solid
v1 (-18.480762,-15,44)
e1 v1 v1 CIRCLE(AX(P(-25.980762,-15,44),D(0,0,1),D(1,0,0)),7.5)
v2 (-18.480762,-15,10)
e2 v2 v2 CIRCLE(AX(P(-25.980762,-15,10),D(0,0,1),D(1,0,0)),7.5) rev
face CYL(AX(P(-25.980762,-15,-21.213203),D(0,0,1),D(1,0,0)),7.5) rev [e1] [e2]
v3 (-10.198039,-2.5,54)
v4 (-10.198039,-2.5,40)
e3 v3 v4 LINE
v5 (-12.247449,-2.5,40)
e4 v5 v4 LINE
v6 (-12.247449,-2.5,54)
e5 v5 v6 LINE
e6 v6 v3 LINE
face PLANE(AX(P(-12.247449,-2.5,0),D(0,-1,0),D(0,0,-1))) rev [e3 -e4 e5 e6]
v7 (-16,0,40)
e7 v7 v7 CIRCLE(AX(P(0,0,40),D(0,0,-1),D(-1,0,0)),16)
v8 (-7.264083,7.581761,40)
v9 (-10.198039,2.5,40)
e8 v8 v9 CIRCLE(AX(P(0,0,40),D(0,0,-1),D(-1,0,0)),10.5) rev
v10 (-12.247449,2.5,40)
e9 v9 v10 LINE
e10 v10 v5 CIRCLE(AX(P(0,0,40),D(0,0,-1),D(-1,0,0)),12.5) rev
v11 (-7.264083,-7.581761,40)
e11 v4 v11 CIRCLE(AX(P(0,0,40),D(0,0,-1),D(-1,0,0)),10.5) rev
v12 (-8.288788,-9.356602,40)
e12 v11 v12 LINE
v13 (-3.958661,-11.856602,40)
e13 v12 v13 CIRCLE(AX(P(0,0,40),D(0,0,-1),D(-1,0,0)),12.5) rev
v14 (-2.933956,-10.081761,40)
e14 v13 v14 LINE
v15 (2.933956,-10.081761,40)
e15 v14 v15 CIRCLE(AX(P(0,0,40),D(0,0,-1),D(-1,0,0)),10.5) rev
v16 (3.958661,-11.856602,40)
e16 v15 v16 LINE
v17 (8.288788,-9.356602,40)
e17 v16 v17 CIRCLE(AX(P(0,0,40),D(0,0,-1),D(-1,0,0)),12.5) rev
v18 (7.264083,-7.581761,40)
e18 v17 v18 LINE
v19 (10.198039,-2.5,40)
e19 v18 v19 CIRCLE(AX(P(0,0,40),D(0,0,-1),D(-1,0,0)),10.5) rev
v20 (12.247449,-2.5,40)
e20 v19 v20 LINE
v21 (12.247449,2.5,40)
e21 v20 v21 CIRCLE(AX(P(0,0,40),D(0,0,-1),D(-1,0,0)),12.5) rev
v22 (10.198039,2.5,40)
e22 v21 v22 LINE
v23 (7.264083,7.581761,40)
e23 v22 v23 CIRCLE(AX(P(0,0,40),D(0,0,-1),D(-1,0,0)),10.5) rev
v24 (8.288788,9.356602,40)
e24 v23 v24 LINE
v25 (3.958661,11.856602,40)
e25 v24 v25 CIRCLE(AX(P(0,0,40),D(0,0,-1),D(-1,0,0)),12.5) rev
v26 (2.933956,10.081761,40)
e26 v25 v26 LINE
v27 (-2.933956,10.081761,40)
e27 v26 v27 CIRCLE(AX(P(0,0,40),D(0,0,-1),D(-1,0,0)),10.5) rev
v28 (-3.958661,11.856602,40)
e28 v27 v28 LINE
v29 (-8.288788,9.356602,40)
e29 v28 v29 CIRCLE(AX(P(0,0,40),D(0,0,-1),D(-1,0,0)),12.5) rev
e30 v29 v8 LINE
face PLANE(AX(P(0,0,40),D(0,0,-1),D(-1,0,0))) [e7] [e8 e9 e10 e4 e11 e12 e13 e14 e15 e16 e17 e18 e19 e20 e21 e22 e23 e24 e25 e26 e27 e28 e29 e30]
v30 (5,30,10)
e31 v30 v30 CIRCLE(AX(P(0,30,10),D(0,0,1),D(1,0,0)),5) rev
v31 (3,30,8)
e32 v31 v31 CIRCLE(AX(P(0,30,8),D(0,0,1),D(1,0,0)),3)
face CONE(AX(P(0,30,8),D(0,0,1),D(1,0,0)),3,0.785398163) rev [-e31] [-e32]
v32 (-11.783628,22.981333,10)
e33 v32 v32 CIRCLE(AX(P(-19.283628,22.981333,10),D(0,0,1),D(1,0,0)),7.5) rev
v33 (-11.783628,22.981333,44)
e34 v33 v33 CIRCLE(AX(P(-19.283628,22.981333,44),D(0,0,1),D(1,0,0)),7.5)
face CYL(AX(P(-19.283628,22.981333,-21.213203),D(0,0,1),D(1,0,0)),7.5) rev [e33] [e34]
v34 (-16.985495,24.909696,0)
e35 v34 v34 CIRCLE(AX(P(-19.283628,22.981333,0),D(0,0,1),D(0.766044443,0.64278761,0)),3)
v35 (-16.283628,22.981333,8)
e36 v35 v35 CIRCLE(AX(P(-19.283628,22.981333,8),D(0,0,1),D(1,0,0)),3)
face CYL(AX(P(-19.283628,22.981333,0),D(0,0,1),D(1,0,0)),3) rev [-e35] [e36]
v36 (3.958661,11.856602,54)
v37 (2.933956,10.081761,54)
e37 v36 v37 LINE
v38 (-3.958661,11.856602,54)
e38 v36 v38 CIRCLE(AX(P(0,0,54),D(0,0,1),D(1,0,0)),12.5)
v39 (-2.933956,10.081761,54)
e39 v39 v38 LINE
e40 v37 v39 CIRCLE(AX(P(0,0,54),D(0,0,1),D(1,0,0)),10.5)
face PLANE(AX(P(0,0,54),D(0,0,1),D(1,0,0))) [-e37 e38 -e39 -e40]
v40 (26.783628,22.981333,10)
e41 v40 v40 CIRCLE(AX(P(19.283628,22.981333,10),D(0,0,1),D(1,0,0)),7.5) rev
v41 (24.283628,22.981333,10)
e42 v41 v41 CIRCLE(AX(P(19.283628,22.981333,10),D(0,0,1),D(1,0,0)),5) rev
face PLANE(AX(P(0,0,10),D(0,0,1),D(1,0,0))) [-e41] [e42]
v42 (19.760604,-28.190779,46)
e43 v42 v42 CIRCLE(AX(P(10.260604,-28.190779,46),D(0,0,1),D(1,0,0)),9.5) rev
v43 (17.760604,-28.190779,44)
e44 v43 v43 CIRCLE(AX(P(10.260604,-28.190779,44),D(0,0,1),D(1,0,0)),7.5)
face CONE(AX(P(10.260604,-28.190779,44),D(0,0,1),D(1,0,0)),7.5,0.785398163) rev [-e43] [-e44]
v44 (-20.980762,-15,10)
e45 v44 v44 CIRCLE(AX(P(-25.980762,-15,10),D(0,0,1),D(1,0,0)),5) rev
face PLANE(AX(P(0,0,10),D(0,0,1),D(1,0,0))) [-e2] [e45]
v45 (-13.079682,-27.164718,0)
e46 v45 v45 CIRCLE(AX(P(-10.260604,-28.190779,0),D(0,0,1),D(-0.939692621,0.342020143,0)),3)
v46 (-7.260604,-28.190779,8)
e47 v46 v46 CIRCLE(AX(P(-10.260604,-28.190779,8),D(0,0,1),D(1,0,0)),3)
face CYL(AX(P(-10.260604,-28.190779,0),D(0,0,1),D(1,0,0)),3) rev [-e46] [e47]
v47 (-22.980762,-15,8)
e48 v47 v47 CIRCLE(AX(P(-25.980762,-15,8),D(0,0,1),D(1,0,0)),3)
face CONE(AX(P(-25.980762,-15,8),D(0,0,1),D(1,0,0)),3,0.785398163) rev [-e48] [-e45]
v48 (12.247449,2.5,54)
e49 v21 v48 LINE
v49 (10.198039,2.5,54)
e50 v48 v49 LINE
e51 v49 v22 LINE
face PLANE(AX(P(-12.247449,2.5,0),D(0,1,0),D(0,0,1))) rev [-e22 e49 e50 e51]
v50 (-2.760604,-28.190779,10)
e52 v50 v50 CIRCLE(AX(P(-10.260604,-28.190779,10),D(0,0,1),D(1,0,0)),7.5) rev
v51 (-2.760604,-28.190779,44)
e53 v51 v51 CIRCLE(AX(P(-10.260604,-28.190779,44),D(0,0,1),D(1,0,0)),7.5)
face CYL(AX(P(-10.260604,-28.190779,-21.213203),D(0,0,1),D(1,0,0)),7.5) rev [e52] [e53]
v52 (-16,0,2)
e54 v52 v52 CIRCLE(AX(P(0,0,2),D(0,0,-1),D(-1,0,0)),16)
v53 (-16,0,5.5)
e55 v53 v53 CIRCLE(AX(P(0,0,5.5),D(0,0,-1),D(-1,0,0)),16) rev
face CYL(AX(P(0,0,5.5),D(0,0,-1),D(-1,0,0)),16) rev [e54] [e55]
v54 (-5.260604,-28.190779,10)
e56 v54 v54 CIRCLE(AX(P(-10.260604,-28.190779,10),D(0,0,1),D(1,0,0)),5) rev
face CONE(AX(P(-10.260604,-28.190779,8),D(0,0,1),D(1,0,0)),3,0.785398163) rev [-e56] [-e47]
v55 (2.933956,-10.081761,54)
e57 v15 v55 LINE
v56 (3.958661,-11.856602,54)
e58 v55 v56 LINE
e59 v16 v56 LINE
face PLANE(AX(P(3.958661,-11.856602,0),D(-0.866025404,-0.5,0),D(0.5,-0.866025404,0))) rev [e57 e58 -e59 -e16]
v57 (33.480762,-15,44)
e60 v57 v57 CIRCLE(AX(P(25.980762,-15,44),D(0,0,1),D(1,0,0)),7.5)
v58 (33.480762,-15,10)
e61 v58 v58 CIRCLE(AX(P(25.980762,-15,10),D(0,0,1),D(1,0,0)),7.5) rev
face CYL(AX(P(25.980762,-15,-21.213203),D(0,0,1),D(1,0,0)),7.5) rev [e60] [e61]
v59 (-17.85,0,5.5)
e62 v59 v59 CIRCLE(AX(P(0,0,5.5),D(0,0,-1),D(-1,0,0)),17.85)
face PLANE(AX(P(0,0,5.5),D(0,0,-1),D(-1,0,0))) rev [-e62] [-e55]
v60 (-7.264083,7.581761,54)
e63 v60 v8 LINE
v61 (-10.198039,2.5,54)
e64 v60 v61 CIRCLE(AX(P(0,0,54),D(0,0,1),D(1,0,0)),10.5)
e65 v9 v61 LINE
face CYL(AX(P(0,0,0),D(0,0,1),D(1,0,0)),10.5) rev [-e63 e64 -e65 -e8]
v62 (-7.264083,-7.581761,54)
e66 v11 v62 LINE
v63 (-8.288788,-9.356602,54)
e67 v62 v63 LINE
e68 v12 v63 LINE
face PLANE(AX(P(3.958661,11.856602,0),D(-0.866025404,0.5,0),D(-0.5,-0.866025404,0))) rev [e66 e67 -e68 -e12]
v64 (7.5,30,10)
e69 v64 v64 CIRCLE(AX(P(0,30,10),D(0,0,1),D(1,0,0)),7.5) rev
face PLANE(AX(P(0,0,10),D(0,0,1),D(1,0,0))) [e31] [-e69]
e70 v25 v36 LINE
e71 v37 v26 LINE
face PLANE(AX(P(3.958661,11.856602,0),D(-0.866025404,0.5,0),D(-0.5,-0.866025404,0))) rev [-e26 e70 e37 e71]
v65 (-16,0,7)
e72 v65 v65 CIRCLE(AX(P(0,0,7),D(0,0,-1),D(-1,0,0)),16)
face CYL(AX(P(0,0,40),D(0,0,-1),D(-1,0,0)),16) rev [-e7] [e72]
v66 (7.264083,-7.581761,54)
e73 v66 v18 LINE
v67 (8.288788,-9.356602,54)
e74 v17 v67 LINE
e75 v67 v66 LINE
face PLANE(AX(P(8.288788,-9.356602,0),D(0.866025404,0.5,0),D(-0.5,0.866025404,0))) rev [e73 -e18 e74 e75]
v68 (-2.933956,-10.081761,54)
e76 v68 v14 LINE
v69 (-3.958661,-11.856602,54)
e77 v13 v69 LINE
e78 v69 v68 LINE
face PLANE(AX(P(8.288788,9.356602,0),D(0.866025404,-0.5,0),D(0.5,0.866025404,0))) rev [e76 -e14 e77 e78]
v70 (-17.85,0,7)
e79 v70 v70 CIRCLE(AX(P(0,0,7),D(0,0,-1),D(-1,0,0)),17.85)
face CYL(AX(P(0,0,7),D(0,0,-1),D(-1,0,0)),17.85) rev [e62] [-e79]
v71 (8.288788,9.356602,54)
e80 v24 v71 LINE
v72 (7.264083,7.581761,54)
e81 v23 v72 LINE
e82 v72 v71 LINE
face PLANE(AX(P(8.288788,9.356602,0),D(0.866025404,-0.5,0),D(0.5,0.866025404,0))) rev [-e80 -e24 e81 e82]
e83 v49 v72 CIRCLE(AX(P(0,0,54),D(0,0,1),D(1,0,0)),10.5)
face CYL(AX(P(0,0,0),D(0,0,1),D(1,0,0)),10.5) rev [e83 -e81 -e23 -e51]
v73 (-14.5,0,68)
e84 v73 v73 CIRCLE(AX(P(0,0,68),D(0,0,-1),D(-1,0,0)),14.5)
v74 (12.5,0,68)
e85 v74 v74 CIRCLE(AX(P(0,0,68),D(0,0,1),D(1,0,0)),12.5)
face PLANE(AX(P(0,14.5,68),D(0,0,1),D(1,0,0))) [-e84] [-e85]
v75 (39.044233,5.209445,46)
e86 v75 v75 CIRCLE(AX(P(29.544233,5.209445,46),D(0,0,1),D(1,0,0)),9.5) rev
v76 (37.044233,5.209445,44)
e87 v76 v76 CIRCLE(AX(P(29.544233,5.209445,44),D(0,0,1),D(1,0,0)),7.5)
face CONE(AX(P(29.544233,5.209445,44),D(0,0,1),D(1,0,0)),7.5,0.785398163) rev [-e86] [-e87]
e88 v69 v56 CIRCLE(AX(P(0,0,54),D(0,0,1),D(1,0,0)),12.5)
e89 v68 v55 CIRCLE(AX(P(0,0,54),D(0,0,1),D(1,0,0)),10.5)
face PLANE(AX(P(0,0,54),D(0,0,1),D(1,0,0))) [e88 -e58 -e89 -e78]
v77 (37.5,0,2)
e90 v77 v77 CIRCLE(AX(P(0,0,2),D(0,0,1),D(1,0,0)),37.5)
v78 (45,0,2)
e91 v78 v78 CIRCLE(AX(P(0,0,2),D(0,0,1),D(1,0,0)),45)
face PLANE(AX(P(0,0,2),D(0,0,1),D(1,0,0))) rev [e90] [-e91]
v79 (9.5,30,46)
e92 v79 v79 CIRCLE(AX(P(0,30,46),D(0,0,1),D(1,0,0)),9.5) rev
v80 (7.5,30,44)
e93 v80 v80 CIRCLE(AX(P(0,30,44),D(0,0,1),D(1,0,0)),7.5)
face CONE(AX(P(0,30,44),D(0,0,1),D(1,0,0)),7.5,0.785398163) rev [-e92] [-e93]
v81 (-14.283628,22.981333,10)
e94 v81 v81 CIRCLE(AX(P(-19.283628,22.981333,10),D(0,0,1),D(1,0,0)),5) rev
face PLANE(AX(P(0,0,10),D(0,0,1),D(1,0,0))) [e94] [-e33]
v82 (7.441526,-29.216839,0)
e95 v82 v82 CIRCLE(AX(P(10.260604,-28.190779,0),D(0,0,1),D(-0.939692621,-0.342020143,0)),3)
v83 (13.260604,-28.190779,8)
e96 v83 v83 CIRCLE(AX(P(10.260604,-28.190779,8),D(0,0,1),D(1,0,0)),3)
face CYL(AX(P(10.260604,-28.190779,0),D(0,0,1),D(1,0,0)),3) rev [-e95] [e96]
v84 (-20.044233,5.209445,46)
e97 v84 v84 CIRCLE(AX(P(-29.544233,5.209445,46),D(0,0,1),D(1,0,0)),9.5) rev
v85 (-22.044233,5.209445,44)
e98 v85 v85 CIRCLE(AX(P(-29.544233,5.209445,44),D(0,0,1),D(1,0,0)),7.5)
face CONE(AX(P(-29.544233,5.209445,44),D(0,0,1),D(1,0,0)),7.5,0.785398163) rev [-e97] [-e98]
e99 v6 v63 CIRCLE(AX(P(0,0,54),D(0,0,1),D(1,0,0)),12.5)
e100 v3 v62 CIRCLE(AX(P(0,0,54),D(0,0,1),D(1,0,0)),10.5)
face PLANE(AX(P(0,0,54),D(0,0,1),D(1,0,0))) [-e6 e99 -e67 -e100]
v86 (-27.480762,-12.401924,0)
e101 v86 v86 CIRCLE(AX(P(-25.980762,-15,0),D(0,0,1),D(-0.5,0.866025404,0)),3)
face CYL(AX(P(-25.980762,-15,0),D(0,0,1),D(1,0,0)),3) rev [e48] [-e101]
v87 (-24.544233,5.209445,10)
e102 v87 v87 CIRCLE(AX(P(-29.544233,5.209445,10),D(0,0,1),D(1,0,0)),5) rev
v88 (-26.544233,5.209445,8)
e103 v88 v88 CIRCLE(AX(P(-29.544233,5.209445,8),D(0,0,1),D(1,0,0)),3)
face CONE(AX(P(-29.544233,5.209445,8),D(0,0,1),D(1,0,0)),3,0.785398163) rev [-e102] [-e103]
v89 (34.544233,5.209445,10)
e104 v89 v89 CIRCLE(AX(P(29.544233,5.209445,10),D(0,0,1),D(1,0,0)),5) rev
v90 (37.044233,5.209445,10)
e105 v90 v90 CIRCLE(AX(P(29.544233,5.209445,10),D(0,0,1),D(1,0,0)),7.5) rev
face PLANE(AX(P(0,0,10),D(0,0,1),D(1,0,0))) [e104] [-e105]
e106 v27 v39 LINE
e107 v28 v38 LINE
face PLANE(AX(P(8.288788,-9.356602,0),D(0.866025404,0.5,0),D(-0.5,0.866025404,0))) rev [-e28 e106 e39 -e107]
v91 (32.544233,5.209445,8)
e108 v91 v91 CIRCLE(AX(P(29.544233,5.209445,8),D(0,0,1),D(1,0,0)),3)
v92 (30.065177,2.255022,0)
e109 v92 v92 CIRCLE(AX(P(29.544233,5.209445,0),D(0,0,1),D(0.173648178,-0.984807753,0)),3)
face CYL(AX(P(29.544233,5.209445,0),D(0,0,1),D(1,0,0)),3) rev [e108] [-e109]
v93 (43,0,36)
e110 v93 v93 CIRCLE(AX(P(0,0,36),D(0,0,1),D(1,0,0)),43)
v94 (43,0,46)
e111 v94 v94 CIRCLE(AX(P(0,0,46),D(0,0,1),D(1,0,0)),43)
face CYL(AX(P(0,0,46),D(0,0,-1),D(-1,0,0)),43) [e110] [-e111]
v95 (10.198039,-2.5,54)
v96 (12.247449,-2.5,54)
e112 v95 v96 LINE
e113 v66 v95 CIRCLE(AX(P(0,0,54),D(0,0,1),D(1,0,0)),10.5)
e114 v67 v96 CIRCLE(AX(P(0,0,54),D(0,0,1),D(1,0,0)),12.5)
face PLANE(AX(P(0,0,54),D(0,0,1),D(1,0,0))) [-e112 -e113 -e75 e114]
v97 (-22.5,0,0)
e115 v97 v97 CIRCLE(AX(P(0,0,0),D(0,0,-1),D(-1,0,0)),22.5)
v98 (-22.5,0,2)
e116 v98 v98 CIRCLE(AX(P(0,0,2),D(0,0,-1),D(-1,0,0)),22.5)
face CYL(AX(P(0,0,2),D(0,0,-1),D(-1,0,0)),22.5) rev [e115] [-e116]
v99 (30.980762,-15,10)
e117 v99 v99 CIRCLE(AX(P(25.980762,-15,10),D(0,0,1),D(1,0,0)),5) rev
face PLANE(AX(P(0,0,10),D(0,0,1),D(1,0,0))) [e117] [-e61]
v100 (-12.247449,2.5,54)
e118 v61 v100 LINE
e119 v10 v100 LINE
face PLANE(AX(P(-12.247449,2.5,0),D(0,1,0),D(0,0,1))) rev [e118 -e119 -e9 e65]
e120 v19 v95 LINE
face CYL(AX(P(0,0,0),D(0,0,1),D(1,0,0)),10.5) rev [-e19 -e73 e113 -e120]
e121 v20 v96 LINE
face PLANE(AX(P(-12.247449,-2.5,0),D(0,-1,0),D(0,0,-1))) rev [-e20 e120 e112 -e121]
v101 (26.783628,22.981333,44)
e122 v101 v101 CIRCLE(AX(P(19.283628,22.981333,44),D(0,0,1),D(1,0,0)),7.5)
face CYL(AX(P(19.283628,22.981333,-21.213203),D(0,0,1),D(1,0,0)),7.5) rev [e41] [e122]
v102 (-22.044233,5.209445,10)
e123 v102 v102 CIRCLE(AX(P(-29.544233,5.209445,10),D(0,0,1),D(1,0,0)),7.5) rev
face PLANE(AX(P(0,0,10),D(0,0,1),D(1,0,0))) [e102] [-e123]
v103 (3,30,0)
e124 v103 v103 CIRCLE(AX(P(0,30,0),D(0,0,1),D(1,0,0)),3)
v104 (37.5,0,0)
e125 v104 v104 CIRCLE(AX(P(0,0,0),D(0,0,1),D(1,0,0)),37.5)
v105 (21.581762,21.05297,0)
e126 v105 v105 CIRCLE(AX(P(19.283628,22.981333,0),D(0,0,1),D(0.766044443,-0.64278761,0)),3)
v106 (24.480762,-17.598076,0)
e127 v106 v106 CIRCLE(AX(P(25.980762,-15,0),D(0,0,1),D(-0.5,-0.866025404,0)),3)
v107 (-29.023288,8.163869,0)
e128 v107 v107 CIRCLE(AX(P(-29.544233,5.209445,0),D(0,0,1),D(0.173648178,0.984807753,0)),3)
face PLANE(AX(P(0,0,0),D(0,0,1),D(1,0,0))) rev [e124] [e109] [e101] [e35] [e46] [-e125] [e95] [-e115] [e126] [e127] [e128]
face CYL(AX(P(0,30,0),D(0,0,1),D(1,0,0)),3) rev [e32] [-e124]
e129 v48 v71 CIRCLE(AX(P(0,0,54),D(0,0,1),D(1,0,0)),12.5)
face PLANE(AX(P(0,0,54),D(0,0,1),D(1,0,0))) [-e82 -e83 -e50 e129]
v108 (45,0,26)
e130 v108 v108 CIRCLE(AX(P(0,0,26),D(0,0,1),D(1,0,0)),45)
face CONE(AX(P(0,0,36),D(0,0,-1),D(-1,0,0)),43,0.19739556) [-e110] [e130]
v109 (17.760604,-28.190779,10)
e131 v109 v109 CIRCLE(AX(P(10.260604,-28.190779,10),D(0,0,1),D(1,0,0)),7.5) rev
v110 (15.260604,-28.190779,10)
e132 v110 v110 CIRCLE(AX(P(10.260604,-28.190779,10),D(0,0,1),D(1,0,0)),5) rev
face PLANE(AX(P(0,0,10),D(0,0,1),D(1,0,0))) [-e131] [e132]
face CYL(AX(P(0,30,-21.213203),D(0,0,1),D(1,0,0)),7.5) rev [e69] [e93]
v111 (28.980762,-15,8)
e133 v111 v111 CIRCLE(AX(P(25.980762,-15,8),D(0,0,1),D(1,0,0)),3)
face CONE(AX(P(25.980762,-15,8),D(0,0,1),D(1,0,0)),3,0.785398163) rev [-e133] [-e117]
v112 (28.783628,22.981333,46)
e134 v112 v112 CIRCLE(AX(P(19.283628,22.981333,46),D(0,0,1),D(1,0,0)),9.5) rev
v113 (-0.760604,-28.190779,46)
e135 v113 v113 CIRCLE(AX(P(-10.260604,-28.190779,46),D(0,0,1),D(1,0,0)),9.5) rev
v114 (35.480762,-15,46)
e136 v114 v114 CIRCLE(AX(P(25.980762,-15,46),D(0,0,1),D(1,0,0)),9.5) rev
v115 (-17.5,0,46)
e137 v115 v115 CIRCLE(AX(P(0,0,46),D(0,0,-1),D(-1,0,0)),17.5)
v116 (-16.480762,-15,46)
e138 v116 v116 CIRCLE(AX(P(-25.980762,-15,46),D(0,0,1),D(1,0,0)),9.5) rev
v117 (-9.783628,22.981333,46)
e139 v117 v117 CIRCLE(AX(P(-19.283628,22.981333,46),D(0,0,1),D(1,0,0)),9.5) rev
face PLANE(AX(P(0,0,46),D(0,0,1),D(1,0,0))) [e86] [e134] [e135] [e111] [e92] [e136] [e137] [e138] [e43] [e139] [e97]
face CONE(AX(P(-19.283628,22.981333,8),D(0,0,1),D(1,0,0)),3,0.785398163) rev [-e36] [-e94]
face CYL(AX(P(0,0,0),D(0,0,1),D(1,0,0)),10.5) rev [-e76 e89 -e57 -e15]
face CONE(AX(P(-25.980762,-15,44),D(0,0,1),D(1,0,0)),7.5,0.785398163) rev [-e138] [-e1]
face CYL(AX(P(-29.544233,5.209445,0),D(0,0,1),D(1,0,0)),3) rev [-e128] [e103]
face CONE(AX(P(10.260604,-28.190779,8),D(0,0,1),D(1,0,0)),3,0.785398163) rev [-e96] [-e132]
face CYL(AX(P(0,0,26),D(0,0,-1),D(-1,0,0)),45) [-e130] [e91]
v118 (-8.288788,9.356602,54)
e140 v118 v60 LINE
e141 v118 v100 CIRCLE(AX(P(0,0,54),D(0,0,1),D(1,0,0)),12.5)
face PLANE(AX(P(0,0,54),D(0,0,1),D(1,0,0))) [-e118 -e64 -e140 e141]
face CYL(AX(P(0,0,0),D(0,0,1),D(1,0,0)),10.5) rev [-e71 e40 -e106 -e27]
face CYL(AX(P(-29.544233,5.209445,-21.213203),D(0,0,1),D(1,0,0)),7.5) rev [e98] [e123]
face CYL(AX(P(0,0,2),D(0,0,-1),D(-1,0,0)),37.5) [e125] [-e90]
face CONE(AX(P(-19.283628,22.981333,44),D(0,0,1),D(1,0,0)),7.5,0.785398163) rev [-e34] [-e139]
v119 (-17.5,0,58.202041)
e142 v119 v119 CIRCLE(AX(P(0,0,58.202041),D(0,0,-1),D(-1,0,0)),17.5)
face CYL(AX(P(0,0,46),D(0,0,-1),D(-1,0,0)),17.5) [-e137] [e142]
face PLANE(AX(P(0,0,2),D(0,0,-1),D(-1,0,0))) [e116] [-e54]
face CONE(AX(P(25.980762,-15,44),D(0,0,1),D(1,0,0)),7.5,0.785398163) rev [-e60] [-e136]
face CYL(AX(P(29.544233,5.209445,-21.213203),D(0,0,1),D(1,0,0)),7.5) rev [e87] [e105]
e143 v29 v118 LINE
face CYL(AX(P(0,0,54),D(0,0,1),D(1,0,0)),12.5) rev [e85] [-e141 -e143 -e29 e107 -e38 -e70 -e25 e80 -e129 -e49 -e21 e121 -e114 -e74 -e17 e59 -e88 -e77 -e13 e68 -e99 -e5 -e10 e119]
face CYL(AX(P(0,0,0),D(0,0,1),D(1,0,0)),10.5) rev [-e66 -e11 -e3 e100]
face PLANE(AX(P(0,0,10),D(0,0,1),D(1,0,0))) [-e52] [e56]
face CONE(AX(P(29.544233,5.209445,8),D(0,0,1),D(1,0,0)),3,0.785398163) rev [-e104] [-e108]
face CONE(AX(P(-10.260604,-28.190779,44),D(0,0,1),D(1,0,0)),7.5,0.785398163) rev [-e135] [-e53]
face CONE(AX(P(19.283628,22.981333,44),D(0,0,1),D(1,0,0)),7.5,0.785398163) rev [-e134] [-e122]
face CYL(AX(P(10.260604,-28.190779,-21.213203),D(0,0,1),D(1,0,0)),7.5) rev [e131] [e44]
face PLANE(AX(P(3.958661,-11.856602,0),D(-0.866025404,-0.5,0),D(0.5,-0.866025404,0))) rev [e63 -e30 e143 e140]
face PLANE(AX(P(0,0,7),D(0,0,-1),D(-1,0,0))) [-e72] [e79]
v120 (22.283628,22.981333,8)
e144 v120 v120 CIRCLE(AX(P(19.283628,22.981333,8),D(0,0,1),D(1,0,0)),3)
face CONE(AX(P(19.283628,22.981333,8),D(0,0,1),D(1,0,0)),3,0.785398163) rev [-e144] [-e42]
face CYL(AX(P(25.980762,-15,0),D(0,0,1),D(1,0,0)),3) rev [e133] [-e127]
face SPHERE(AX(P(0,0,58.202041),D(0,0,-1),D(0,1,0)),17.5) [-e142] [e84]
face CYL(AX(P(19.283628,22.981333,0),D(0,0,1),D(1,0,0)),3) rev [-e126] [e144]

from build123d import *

# Parameters (mm, degrees)
SKETCH_1_R                           = 37.5
EXTRUDE_1_DEPTH                      = 2
SKETCH_2_R                           = 45
EXTRUDE_2_DEPTH                      = 24
SKETCH_3_R                           = 43
EXTRUDE_3_DEPTH                      = 10
SKETCH_4_R                           = 43
EXTRUDE_4_DEPTH                      = 10
SKETCH_7_R                           = 7.5
CUT_EXTRUDE_1_DEPTH                  = 36
SKETCH_8_R                           = 3
CUT_EXTRUDE_2_DEPTH                  = 87.104587567
CHAMFER_1_SIZE                       = 2
PATTERN_CIRCULAR_1_COUNT             = 9
CHAMFER_1_OF_PATTERN_CIRCULAR_1_SIZE = 2
SKETCH_9_R                           = 12.5
CUT_EXTRUDE_3_DEPTH                  = 14
CUT_EXTRUDE_4_DEPTH                  = 84.462566459
PATTERN_CIRCULAR_2_COUNT             = 3
SKETCH_11_R                          = 10.5
CUT_EXTRUDE_5_DEPTH                  = 94.134311615
SKETCH_12_R                          = 22.5
CUT_EXTRUDE_6_DEPTH                  = 2
SKETCH_13_R                          = 16
CUT_EXTRUDE_7_DEPTH                  = 3.5
SKETCH_14_R                          = 17.85
CUT_EXTRUDE_8_DEPTH                  = 1.5
SKETCH_15_R                          = 16
CUT_EXTRUDE_9_DEPTH                  = 40


# Read off the part's stored shape, not the designer's step: 边界1
with BuildPart() as part:
    # 草图1 → 凸台-拉伸1 (new body)
    with BuildSketch(Plane.XY):
        Circle(SKETCH_1_R)
    extrude(amount=EXTRUDE_1_DEPTH)

    # 草图2 → 凸台-拉伸2 (add)
    with BuildSketch(Plane.XY.offset(2)):
        Circle(SKETCH_2_R)
    extrude(amount=EXTRUDE_2_DEPTH)

    # 草图3 → 凸台-拉伸3 (add)
    with BuildSketch(Plane.XY.offset(26)):
        Circle(SKETCH_3_R)
    extrude(amount=EXTRUDE_3_DEPTH)

    # 边界1 outline → 边界1 (revolve)
    with BuildSketch(Plane.XZ):
        Polygon((45, 26), (43, 36), (43, 26), align=None)
    revolve(axis=Axis((0, 0, 0), (0, 0, 1)))

    # 草图4 → 凸台-拉伸4 (add)
    with BuildSketch(Plane.XY.offset(36)):
        Circle(SKETCH_4_R)
    extrude(amount=EXTRUDE_4_DEPTH)

    # 草图6 → 旋转1 (revolve)
    with BuildSketch(Plane(origin=(0, 0, 0), x_dir=(0, 0, -1), z_dir=(1, 0, 0)), mode=Mode.PRIVATE) as revolve_1_sk:
        with BuildLine():
            Line((-46, 0), (-46, 17.5))
            Line((-46, 17.5), (-58.202041029, 17.5))
            ThreePointArc((-58.202041029, 17.5), (-63.325516412, 16.733200531), (-68, 14.5))
            Line((-68, 14.5), (-68, 0))
            Line((-68, 0), (-46, 0))
        make_face()
    revolve(revolve_1_sk.sketch.rotate(Axis((0, 0, 46), (0, 0, 1)), 90), axis=Axis((0, 0, 46), (0, 0, 1)))

    # 草图7 → 切除-拉伸1 (cut)
    with BuildSketch(Plane.XY.offset(46)):
        with Locations((0, 30)):
            Circle(SKETCH_7_R)
    cut_extrude_1 = extrude(amount=-CUT_EXTRUDE_1_DEPTH, mode=Mode.SUBTRACT)

    # 草图8 → 切除-拉伸2 (cut, through all)
    with BuildSketch(Plane.XY.offset(10)):
        with Locations((0, 30)):
            Circle(SKETCH_8_R)
    cut_extrude_2 = extrude(amount=-CUT_EXTRUDE_2_DEPTH, mode=Mode.SUBTRACT)

    # 倒角1
    chamfer_1_edges = [part.edges().sort_by_distance(p)[0] for p in [
        (-7.5, 30, 46),
        (-3, 30, 10),
    ]]
    chamfer(chamfer_1_edges, length=CHAMFER_1_SIZE)

    # 阵列(圆周)1: 切除-拉伸1, 切除-拉伸2 ×9 about axis
    pattern_circular_1_axis = Axis((0, 0, 0), (0, 0, 1))
    add([cut_extrude_1.rotate(pattern_circular_1_axis, i * 360 / PATTERN_CIRCULAR_1_COUNT) for i in range(1, PATTERN_CIRCULAR_1_COUNT)], mode=Mode.SUBTRACT)
    add([cut_extrude_2.rotate(pattern_circular_1_axis, i * 360 / PATTERN_CIRCULAR_1_COUNT) for i in range(1, PATTERN_CIRCULAR_1_COUNT)], mode=Mode.SUBTRACT)

    # 倒角1 of 阵列(圆周)1
    chamfer_1_of_pattern_circular_1_edges = [part.edges().sort_by_distance(p)[0] for p in [
        (-25.028961614, 18.160426221, 46),
        (-21.58176162, 21.052970465, 10),
        (-30.846593923, -2.176612818, 46),
        (-30.065177123, 2.255022071, 10),
        (-22.230762114, -21.495190528, 46),
        (-24.480762114, -17.598076211, 10),
        (-3.212909644, -30.755929699, 46),
        (-7.441526437, -29.216839054, 10),
        (17.308298956, -25.625627549, 46),
        (13.079682162, -27.164718194, 10),
        (29.730762114, -8.504809472, 46),
        (27.480762114, -12.401923789, 10),
        (28.241871258, 12.595503478, 46),
        (29.023288057, 8.163868589, 10),
        (13.538294967, 27.802240366, 46),
        (16.985494961, 24.909696123, 10),
    ]]
    chamfer(chamfer_1_of_pattern_circular_1_edges, length=CHAMFER_1_OF_PATTERN_CIRCULAR_1_SIZE)

    # 草图9 → 切除-拉伸3 (cut)
    with BuildSketch(Plane.XY.offset(68)):
        Circle(SKETCH_9_R)
    extrude(amount=-CUT_EXTRUDE_3_DEPTH, mode=Mode.SUBTRACT)

    # 草图10 → 切除-拉伸4 (cut, through all)
    with BuildSketch(Plane.XY.offset(54)):
        with BuildLine():
            Line((-12.247448714, -2.5), (12.247448714, -2.5))
            ThreePointArc((12.247448714, -2.5), (12.5, 0), (12.247448714, 2.5))
            Line((12.247448714, 2.5), (-12.247448714, 2.5))
            ThreePointArc((-12.247448714, 2.5), (-12.5, 0), (-12.247448714, -2.5))
        make_face()
    cut_extrude_4 = extrude(amount=-CUT_EXTRUDE_4_DEPTH, mode=Mode.SUBTRACT)

    # 阵列(圆周)2: 切除-拉伸4 ×3 about axis
    pattern_circular_2_axis = Axis((0, 0, 0), (0, 0, 1))
    for i in range(1, PATTERN_CIRCULAR_2_COUNT):
        add(cut_extrude_4.rotate(pattern_circular_2_axis, i * 360 / PATTERN_CIRCULAR_2_COUNT), mode=Mode.SUBTRACT)

    # 草图11 → 切除-拉伸5 (cut, through all)
    with BuildSketch(Plane.XY.offset(68)):
        Circle(SKETCH_11_R)
    extrude(amount=-CUT_EXTRUDE_5_DEPTH, mode=Mode.SUBTRACT)

    # 草图12 → 切除-拉伸6 (cut)
    with BuildSketch(Plane(origin=(0, 0, 0), x_dir=(-1, 0, 0), z_dir=(0, 0, -1))):
        Circle(SKETCH_12_R)
    extrude(amount=-CUT_EXTRUDE_6_DEPTH, mode=Mode.SUBTRACT)

    # 草图13 → 切除-拉伸7 (cut)
    with BuildSketch(Plane(origin=(0, 0, 2), x_dir=(-1, 0, 0), z_dir=(0, 0, -1))):
        Circle(SKETCH_13_R)
    extrude(amount=-CUT_EXTRUDE_7_DEPTH, mode=Mode.SUBTRACT)

    # 草图14 → 切除-拉伸8 (cut)
    with BuildSketch(Plane(origin=(0, 0, 5.5), x_dir=(-1, 0, 0), z_dir=(0, 0, -1))):
        Circle(SKETCH_14_R)
    extrude(amount=-CUT_EXTRUDE_8_DEPTH, mode=Mode.SUBTRACT)

    # 草图15 → 切除-拉伸9 (cut)
    with BuildSketch(Plane(origin=(0, 0, 0), x_dir=(-1, 0, 0), z_dir=(0, 0, -1))):
        Circle(SKETCH_15_R)
    extrude(amount=-CUT_EXTRUDE_9_DEPTH, mode=Mode.SUBTRACT)


solid = part.part
